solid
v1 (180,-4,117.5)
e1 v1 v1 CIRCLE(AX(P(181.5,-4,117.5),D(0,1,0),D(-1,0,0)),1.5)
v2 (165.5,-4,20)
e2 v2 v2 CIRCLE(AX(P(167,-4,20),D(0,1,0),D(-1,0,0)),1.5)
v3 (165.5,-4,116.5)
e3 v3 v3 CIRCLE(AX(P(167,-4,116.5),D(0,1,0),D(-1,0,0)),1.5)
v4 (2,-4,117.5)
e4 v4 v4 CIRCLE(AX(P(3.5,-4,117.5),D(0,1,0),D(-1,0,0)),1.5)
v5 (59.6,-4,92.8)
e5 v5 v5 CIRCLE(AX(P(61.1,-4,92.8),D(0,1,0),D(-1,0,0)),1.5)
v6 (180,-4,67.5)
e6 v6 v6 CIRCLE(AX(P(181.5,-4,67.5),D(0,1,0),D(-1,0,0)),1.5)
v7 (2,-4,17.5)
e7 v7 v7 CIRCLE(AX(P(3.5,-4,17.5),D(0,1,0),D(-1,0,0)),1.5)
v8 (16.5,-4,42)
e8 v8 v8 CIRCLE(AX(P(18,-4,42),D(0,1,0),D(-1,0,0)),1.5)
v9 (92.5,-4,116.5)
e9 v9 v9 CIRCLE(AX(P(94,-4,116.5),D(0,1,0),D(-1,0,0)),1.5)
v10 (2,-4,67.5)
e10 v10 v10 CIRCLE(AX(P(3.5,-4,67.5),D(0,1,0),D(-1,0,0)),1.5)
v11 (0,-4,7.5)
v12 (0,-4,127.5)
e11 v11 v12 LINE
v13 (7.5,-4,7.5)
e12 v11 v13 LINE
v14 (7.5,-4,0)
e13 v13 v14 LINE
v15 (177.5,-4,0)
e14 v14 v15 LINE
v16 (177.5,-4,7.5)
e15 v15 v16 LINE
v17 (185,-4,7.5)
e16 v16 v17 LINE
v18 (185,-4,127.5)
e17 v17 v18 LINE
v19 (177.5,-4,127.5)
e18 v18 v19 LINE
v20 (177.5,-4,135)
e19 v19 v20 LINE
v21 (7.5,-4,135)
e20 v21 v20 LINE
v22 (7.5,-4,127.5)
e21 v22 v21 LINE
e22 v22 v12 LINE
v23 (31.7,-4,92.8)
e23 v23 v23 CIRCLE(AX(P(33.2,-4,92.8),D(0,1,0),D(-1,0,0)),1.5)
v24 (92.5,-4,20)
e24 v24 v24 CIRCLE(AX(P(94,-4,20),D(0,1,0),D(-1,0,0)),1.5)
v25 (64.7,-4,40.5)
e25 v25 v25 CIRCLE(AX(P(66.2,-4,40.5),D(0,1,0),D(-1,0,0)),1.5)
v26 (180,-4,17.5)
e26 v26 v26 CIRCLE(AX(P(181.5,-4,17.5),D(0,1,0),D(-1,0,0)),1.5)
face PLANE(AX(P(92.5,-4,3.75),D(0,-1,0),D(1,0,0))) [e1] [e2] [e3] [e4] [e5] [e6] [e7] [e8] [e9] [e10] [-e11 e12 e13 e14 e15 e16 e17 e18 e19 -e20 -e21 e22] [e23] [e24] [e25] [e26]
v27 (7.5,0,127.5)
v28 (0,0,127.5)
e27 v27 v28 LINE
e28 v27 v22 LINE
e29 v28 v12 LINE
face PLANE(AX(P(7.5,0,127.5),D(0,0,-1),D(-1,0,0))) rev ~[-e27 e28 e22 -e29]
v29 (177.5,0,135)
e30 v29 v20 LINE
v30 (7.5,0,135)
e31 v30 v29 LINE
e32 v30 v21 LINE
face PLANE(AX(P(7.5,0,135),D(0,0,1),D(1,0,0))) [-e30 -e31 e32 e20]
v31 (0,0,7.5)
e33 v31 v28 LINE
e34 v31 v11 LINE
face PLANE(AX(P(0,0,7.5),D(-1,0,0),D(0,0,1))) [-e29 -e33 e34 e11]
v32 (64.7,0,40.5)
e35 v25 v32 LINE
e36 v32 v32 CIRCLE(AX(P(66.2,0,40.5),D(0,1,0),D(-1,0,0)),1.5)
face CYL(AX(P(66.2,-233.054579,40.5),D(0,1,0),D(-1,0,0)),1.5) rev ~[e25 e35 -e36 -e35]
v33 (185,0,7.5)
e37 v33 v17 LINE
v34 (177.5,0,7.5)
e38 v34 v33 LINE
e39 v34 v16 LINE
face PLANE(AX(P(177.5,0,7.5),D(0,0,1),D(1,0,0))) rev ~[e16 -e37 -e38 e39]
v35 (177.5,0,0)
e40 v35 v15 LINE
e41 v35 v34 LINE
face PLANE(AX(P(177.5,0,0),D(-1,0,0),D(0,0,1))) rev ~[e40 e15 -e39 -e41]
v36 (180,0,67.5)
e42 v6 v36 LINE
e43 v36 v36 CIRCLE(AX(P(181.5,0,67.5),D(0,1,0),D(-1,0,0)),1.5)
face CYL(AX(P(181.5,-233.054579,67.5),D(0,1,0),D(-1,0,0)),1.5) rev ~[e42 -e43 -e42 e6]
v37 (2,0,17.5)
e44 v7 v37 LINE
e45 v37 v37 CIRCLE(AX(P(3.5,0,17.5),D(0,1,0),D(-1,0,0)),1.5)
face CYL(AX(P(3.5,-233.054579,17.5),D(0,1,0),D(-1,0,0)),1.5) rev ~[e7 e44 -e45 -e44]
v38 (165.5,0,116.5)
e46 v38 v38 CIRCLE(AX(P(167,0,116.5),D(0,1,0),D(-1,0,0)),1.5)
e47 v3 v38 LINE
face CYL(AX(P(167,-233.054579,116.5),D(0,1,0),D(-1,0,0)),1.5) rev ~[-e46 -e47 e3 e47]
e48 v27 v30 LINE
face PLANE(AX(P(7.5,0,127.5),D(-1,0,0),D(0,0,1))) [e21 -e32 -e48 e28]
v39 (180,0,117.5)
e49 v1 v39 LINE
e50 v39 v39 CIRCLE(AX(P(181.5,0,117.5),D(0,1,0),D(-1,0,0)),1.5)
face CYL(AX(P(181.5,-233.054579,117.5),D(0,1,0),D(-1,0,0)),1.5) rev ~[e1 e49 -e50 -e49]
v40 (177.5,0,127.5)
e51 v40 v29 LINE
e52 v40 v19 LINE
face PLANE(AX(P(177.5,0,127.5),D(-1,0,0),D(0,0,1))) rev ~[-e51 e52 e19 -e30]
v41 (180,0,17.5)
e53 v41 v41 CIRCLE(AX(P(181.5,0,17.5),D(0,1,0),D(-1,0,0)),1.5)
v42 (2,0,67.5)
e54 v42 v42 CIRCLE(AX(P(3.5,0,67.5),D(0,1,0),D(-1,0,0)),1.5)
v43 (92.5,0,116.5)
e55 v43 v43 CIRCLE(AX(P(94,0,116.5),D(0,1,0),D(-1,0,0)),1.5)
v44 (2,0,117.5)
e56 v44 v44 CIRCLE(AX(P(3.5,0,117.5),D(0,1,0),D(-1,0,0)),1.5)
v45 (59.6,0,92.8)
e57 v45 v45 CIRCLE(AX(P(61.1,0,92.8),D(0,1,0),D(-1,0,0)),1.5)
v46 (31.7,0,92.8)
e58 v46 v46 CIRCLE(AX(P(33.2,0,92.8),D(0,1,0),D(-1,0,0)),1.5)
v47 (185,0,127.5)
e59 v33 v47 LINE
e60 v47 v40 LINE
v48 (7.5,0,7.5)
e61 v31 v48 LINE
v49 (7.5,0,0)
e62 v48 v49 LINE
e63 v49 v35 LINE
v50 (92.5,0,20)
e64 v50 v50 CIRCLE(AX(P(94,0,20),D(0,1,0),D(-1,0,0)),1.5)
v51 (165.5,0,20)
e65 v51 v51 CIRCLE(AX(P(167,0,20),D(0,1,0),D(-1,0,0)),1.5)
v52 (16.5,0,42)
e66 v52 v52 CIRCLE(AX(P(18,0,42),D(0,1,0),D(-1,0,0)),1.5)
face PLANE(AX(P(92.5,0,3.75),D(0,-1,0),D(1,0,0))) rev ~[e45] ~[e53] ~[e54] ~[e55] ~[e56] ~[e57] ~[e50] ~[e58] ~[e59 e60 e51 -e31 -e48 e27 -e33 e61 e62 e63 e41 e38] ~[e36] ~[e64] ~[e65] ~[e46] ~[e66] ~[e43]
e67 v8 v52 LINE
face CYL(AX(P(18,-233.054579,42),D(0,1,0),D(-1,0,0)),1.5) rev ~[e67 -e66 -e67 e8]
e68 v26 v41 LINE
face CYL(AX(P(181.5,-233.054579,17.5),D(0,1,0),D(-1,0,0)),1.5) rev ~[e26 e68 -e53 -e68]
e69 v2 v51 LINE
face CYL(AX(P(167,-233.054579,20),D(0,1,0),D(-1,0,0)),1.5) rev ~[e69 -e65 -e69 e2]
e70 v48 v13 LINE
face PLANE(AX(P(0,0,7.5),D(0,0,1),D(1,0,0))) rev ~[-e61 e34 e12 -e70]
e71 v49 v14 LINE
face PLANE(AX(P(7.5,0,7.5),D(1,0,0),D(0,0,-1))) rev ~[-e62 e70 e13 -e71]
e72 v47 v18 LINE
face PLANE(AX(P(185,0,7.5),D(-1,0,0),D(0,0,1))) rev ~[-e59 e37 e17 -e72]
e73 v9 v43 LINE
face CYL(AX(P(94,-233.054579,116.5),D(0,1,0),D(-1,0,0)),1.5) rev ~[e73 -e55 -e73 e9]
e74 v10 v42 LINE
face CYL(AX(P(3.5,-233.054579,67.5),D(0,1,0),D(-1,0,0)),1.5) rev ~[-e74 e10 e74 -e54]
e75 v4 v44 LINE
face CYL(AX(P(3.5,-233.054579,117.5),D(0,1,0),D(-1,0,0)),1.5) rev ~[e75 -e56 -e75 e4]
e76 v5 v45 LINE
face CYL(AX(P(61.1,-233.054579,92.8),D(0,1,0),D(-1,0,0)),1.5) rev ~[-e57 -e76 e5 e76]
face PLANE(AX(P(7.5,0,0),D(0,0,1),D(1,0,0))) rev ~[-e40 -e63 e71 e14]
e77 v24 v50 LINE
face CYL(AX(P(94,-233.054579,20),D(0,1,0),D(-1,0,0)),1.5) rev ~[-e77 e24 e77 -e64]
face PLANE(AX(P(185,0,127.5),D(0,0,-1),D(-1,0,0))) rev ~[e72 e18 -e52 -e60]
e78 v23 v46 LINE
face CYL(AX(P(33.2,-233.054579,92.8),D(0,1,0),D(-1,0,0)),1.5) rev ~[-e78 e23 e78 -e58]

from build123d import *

# Parameters (mm, degrees)
F0_W     = 170
F0_H     = 7.5
F0_H_2   = 120
F0_W_2   = 7.5
F1_DEPTH = 4
F3_D     = 3
F5_D     = 3
F7_D     = 3


with BuildPart() as f1:
    # F0 (on Front) → F1 (new body)
    with BuildSketch(Plane.XZ):
        with Locations((92.5, 3.75)):
            Rectangle(F0_W, F0_H)
        with Locations((92.5, 67.5)):
            Rectangle(F0_W, F0_H_2)
        with Locations((3.75, 67.5)):
            Rectangle(F0_W_2, F0_H_2)
        with Locations((181.25, 67.5)):
            Rectangle(F0_W_2, F0_H_2)
        with Locations((92.5, 131.25)):
            Rectangle(F0_W, F0_H)
    extrude(amount=F1_DEPTH)

    # F3 (through all)
    with Locations(Plane.XZ.offset(4)):
        with Locations((3.5, 117.5), (3.5, 67.5), (3.5, 17.5), (181.5, 17.5), (181.5, 67.5), (181.5, 117.5)):
            Hole(F3_D / 2)

    # F5 (through all)
    with Locations(Plane.XZ.offset(4)):
        with Locations((94, 116.5), (167, 116.5), (167, 20), (94, 20)):
            Hole(F5_D / 2)

    # F7 (through all)
    with Locations(Plane.XZ.offset(4)):
        with Locations((18, 42), (33.2, 92.8), (61.1, 92.8), (66.2, 40.5)):
            Hole(F7_D / 2)


solid = f1.part
